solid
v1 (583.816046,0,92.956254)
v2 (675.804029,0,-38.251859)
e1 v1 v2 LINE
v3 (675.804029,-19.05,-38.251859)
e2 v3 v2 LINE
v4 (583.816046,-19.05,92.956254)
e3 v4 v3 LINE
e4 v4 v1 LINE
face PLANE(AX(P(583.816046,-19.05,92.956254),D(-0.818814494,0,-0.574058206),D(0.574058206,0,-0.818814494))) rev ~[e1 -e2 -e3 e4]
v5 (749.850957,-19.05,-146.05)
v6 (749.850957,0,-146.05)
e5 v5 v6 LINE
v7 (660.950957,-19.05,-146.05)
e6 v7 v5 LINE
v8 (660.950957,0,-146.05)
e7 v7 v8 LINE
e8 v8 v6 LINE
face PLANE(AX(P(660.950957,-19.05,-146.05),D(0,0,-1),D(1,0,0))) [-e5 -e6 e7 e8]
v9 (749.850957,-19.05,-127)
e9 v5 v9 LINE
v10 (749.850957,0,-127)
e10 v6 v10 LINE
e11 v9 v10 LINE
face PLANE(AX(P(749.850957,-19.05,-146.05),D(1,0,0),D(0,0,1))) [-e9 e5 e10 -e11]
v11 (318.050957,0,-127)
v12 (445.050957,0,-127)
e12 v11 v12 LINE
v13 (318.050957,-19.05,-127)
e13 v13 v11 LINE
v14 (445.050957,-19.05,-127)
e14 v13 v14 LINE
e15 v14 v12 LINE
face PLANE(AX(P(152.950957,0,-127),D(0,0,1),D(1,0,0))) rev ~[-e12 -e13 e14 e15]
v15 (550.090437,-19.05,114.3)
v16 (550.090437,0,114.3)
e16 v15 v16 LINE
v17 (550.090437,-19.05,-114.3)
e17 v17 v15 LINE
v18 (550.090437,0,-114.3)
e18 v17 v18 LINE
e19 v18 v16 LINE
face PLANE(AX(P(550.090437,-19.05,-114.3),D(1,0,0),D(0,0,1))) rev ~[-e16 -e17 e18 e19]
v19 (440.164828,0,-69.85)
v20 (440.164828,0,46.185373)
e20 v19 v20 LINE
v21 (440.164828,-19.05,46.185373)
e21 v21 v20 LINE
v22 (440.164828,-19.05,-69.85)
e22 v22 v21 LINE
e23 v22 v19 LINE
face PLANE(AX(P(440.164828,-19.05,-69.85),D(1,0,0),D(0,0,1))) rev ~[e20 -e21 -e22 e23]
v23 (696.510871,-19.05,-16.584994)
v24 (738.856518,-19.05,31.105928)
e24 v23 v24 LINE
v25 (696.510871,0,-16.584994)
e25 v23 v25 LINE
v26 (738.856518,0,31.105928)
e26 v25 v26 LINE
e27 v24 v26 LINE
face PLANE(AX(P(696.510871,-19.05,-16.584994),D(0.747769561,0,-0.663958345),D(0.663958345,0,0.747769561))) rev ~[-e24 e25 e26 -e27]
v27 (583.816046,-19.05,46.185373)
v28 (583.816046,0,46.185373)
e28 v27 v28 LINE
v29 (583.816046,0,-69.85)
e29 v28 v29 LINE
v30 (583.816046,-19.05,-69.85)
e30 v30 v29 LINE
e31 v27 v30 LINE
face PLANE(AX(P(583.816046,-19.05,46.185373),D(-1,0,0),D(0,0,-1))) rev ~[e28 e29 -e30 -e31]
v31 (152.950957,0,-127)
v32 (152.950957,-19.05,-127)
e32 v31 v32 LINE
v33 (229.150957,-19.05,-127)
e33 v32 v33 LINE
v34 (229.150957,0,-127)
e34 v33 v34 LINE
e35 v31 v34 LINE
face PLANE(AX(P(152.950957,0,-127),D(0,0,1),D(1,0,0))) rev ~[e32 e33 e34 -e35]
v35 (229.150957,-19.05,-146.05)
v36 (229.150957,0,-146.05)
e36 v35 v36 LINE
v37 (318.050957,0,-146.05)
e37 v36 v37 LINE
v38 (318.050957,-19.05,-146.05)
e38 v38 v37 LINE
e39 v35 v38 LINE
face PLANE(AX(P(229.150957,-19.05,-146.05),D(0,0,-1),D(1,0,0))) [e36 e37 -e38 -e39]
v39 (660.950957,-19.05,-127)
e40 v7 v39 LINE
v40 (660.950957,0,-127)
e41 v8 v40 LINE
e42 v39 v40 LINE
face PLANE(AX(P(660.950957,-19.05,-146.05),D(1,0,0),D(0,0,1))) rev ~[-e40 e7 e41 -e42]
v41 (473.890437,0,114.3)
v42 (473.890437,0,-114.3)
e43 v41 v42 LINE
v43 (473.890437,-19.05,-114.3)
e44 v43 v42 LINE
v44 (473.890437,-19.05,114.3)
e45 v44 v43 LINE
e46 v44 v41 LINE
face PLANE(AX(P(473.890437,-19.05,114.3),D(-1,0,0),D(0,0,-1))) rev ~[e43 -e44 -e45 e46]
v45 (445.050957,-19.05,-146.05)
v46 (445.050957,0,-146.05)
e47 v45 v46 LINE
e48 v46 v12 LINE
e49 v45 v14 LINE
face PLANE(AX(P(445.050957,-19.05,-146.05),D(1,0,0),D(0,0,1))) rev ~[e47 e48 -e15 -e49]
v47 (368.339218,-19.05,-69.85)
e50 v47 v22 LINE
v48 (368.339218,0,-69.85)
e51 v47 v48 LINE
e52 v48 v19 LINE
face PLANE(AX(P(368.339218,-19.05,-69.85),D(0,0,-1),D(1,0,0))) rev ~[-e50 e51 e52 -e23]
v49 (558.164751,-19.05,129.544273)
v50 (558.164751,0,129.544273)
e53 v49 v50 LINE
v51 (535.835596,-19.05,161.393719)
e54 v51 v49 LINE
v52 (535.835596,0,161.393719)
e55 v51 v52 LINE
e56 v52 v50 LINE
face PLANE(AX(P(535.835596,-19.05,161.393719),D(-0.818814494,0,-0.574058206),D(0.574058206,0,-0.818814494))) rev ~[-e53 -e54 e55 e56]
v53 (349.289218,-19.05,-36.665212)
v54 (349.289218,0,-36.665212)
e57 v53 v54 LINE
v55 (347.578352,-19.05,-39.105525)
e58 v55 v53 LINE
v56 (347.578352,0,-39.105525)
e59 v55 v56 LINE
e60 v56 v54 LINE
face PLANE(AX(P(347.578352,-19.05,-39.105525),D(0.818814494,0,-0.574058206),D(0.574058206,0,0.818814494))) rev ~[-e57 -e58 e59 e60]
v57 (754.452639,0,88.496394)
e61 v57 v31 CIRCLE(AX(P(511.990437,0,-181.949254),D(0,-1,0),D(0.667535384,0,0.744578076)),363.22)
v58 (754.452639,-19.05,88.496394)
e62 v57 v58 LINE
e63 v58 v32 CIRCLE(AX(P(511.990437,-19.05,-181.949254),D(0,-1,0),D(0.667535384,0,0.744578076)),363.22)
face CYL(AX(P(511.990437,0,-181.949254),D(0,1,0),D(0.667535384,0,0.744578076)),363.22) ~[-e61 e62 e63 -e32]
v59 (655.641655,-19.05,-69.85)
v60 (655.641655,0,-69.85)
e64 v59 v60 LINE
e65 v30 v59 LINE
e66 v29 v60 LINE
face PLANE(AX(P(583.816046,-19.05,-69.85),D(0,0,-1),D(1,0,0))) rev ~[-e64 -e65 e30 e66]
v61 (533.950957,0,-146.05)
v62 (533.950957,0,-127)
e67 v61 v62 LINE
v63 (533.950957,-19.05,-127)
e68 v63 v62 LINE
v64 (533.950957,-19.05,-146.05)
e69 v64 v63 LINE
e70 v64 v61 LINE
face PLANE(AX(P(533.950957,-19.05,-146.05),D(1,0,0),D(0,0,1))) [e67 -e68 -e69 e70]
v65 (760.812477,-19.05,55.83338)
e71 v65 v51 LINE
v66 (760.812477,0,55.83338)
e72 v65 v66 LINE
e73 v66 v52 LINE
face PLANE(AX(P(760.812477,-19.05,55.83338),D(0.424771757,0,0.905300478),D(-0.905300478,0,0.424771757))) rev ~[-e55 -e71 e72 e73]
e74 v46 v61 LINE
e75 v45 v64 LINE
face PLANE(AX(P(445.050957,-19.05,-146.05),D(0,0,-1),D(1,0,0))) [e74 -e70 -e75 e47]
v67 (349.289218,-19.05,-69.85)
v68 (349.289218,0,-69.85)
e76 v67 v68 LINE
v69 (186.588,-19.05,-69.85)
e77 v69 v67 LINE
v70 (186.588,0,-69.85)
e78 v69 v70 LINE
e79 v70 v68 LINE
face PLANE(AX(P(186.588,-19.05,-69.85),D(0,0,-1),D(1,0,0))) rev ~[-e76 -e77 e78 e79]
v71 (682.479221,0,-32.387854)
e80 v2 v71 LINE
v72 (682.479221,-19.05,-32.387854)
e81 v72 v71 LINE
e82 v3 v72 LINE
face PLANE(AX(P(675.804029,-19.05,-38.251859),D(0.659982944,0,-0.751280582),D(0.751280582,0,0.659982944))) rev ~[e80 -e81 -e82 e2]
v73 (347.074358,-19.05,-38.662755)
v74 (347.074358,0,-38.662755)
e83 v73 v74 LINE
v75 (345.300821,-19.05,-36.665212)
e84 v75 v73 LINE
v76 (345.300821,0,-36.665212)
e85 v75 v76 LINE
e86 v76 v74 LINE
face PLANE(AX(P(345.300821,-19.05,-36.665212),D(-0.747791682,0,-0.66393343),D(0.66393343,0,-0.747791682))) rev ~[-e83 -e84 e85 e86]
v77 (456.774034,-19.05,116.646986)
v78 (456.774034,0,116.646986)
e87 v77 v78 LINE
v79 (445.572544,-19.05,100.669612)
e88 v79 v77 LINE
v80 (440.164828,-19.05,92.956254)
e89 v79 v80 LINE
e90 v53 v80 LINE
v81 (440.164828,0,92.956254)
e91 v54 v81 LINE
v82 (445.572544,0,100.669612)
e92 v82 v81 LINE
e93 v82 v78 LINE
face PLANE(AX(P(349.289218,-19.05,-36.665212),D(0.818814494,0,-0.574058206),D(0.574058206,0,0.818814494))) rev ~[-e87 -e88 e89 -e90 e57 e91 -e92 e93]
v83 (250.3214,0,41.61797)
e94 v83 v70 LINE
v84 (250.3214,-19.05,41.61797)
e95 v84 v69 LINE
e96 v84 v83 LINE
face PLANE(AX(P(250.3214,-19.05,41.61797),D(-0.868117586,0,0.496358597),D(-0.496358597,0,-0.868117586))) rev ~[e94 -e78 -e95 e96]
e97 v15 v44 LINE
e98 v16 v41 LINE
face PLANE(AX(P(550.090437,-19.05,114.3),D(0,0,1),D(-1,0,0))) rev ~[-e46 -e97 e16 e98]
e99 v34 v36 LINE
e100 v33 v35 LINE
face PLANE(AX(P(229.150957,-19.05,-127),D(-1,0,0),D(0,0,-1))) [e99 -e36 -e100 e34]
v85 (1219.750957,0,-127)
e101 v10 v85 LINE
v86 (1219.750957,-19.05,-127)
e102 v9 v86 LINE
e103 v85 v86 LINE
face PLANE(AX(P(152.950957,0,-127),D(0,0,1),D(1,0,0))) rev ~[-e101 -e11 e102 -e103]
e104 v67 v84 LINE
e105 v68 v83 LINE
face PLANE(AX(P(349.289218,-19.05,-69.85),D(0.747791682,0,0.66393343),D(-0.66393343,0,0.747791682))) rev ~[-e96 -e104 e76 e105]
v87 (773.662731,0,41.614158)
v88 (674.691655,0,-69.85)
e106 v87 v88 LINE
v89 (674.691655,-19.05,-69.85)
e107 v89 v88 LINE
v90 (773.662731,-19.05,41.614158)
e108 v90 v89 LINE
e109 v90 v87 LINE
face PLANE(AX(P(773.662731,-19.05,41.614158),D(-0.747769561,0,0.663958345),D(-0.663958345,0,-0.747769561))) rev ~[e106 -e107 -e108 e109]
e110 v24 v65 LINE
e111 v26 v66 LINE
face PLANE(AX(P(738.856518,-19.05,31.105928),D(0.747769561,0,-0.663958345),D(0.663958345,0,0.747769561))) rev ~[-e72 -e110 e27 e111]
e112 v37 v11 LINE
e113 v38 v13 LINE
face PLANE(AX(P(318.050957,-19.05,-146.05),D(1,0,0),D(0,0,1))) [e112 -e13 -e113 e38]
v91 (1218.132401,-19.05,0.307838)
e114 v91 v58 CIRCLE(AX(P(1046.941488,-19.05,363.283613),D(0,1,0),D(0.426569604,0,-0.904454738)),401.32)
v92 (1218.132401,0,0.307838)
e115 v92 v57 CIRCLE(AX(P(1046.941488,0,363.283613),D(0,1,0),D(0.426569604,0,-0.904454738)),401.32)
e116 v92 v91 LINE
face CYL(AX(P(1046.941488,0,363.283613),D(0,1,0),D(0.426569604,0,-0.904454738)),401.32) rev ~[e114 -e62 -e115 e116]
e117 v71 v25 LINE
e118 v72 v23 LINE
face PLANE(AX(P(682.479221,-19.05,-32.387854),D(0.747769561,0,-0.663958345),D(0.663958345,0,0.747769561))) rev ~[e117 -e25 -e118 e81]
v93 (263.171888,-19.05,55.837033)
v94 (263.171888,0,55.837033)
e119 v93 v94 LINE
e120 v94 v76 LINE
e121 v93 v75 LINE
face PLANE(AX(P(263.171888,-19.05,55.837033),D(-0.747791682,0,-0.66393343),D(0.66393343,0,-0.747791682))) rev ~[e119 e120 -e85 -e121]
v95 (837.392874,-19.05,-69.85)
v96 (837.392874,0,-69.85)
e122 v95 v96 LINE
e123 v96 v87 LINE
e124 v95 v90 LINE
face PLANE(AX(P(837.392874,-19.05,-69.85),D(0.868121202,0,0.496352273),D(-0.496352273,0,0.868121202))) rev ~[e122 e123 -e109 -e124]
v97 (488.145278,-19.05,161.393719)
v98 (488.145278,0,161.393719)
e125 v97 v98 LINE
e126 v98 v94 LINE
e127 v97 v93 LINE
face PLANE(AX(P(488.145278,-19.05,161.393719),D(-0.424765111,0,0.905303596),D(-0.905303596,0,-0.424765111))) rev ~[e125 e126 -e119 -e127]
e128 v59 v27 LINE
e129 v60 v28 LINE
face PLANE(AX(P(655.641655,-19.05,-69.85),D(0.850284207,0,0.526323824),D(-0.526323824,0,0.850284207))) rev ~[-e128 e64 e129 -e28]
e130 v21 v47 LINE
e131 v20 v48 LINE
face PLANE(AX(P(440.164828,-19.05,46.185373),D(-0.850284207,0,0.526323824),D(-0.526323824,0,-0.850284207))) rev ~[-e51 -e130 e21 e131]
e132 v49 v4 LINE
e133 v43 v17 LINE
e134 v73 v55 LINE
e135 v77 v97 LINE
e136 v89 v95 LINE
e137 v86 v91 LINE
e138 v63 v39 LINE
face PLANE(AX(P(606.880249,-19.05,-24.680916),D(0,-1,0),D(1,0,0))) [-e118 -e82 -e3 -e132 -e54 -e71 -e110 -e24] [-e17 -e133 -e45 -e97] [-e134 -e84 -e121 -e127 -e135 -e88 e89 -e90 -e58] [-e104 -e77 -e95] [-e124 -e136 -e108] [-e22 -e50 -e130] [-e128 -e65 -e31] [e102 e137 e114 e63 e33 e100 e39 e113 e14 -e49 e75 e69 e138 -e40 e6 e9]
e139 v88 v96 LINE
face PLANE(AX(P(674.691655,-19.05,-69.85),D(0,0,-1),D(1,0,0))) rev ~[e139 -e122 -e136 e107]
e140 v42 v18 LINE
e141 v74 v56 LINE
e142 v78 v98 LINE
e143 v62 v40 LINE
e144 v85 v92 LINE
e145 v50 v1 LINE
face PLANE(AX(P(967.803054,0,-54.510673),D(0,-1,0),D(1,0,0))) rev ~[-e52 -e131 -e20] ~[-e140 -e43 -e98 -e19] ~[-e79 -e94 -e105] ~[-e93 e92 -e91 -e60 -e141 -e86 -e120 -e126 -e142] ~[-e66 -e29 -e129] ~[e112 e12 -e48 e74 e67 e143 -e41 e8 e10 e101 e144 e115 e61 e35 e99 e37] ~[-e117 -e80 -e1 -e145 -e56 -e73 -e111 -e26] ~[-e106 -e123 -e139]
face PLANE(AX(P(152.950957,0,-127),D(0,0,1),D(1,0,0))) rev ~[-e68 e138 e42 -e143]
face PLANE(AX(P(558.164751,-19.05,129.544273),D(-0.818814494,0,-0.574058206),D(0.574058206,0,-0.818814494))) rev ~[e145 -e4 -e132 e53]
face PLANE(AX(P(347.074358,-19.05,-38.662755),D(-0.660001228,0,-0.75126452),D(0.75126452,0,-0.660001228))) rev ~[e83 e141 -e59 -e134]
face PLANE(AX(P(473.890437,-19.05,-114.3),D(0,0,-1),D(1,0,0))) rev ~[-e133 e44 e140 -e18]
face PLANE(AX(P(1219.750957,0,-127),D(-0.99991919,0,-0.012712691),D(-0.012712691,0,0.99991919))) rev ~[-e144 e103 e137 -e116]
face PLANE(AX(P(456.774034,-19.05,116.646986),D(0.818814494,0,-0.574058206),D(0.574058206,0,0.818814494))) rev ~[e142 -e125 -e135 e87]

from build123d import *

# Parameters (mm, degrees)
F1_DEPTH = 19.05
F3_DEPTH = 25.4
F4_W     = 88.9
F4_H     = 19.05
F4_W_2   = 38.1
F4_H_2   = 44.45
F5_DEPTH = 19.05
F6_DEPTH = 25.4


with BuildPart() as f1:
    # F0 (on Front) → F1 (new body)
    with BuildSketch(Plane.XZ):
        with BuildLine():
            Line((754.4526390882, -127), (1219.7509574175, -127))
            Line((1219.7509574175, -127), (1218.1324014764, 0.3078377019))
            ThreePointArc((1218.1324014764, 0.3078377019), (971.9574719259, -30.9690211882), (754.4526390882, 88.4963944497))
            Line((754.4526390882, 88.4963944497), (754.4526390882, -127))
        make_face()
        with BuildLine():
            Line((152.9509574175, -127), (754.4526390882, -127))
            Line((754.4526390882, -127), (754.4526390882, 88.4963944497))
            ThreePointArc((754.4526390882, 88.4963944497), (389.4863986152, 159.9886479518), (152.9509574175, -127))
        make_face()
    extrude(amount=F1_DEPTH)

    # F2 (on face) → F3 (cut)
    with BuildSketch(Plane.XZ.offset(19.05)):
        Polygon((349.2892183732, -69.85), (250.3213995681, 41.6179700068), (186.5879998116, -69.85), (250.3213995681, -69.85), (313.393828538, -69.85), (314.0547993247, -69.85), align=None)
        Polygon((398.7721789756, 33.9153755605), (456.7740343957, 116.6469860451), (488.14527835, 161.3937189979), (263.1718880821, 55.8370334618), (275.3515595595, 42.1190060128), (321.7644516922, -10.1560762376), (345.300821131, -36.6652117763), (347.0743577182, -38.6627552758), (347.5783524621, -39.1055249546), (349.2892183732, -36.6652117763), align=None)
        Polygon((511.9904369348, 162.2207457014), (368.3392183732, -69.85), (655.6416554964, -69.85), align=None)
        Polygon((535.8355955196, 161.3937189979), (558.164750711, 129.544272866), (618.0461857734, 44.1317024412), (675.8040291483, -38.2518586693), (682.4792207708, -32.3878542947), (696.5108706698, -16.5849944314), (738.8565177121, 31.1059279369), (760.8124771809, 55.8333800289), align=None)
        Polygon((837.3928740579, -69.85), (773.6627312413, 41.6141579413), (674.6916554964, -69.85), align=None)
    extrude(amount=-F3_DEPTH, mode=Mode.SUBTRACT)

    # F4 (on face) → F5 (join)
    with BuildSketch(Plane.XZ.offset(19.05)):
        with Locations((705.4009574175, -136.525)):
            Rectangle(F4_W, F4_H)
        with Locations((489.5009574175, -136.525)):
            Rectangle(F4_W, F4_H)
        Polygon((250.3213995681, -127), (229.1509574175, -127), (229.1509574175, -146.05), (318.0509574175, -146.05), (318.0509574175, -127), align=None)
        Polygon((583.8160462156, -69.85), (655.6416554964, -69.85), (583.8160462156, 46.1853728507), align=None)
        Polygon((583.8160462156, -69.85), (583.8160462156, 46.1853728507), (550.0904369348, 100.6696116438), (550.0904369348, -69.85), align=None)
        Polygon((550.0904369348, 100.6696116438), (583.8160462156, 46.1853728507), (583.8160462156, 92.9562538667), (578.4083301084, 100.6696116438), align=None)
        Polygon((550.0904369348, -69.85), (550.0904369348, 100.6696116438), (541.6532601983, 114.3), (511.9904369348, 114.3), (511.9904369348, -69.85), align=None)
        Polygon((541.6532601983, 114.3), (550.0904369348, 100.6696116438), (550.0904369348, 114.3), align=None)
        Polygon((578.4083301084, 100.6696116438), (583.8160462156, 92.9562538667), (618.0461857734, 44.1317024412), (675.8040291483, -38.2518586693), (682.4792207708, -32.3878542947), (696.5108706698, -16.5849944314), (738.8565177121, 31.1059279369), (760.8124771809, 55.8333800289), (535.8355955196, 161.3937189979), (558.164750711, 129.544272866), align=None)
        with Locations((531.0404369348, -92.075)):
            Rectangle(F4_W_2, F4_H_2)
        Polygon((511.9904369348, 114.3), (541.6532601983, 114.3), (511.9904369348, 162.2207457014), (482.3276136712, 114.3), align=None)
        with Locations((492.9404369348, -92.075)):
            Rectangle(F4_W_2, F4_H_2)
        Polygon((473.8904369348, -69.85), (511.9904369348, -69.85), (511.9904369348, 114.3), (482.3276136712, 114.3), (473.8904369348, 100.6696116438), align=None)
        Polygon((440.164827654, -69.85), (473.8904369348, -69.85), (473.8904369348, 100.6696116438), (440.164827654, 46.1853728507), align=None)
        Polygon((473.8904369348, 100.6696116438), (482.3276136712, 114.3), (473.8904369348, 114.3), align=None)
        Polygon((368.3392183732, -69.85), (440.164827654, -69.85), (440.164827654, 46.1853728507), align=None)
        Polygon((440.164827654, 46.1853728507), (473.8904369348, 100.6696116438), (445.5725437612, 100.6696116438), (440.164827654, 92.9562538667), align=None)
    extrude(amount=-F5_DEPTH)

    # F4 (on face) → F6 (cut)
    with BuildSketch(Plane.XZ.offset(19.05)):
        Polygon((583.8160462156, -69.85), (655.6416554964, -69.85), (583.8160462156, 46.1853728507), align=None)
        Polygon((550.0904369348, -69.85), (550.0904369348, 100.6696116438), (541.6532601983, 114.3), (511.9904369348, 114.3), (511.9904369348, -69.85), align=None)
        Polygon((541.6532601983, 114.3), (550.0904369348, 100.6696116438), (550.0904369348, 114.3), align=None)
        Polygon((578.4083301084, 100.6696116438), (583.8160462156, 92.9562538667), (618.0461857734, 44.1317024412), (675.8040291483, -38.2518586693), (682.4792207708, -32.3878542947), (696.5108706698, -16.5849944314), (738.8565177121, 31.1059279369), (760.8124771809, 55.8333800289), (535.8355955196, 161.3937189979), (558.164750711, 129.544272866), align=None)
        with Locations((531.0404369348, -92.075)):
            Rectangle(F4_W_2, F4_H_2)
        with Locations((492.9404369348, -92.075)):
            Rectangle(F4_W_2, F4_H_2)
        Polygon((473.8904369348, -69.85), (511.9904369348, -69.85), (511.9904369348, 114.3), (482.3276136712, 114.3), (473.8904369348, 100.6696116438), align=None)
        Polygon((473.8904369348, 100.6696116438), (482.3276136712, 114.3), (473.8904369348, 114.3), align=None)
        Polygon((368.3392183732, -69.85), (440.164827654, -69.85), (440.164827654, 46.1853728507), align=None)
    extrude(amount=-F6_DEPTH, mode=Mode.SUBTRACT)


solid = f1.part
